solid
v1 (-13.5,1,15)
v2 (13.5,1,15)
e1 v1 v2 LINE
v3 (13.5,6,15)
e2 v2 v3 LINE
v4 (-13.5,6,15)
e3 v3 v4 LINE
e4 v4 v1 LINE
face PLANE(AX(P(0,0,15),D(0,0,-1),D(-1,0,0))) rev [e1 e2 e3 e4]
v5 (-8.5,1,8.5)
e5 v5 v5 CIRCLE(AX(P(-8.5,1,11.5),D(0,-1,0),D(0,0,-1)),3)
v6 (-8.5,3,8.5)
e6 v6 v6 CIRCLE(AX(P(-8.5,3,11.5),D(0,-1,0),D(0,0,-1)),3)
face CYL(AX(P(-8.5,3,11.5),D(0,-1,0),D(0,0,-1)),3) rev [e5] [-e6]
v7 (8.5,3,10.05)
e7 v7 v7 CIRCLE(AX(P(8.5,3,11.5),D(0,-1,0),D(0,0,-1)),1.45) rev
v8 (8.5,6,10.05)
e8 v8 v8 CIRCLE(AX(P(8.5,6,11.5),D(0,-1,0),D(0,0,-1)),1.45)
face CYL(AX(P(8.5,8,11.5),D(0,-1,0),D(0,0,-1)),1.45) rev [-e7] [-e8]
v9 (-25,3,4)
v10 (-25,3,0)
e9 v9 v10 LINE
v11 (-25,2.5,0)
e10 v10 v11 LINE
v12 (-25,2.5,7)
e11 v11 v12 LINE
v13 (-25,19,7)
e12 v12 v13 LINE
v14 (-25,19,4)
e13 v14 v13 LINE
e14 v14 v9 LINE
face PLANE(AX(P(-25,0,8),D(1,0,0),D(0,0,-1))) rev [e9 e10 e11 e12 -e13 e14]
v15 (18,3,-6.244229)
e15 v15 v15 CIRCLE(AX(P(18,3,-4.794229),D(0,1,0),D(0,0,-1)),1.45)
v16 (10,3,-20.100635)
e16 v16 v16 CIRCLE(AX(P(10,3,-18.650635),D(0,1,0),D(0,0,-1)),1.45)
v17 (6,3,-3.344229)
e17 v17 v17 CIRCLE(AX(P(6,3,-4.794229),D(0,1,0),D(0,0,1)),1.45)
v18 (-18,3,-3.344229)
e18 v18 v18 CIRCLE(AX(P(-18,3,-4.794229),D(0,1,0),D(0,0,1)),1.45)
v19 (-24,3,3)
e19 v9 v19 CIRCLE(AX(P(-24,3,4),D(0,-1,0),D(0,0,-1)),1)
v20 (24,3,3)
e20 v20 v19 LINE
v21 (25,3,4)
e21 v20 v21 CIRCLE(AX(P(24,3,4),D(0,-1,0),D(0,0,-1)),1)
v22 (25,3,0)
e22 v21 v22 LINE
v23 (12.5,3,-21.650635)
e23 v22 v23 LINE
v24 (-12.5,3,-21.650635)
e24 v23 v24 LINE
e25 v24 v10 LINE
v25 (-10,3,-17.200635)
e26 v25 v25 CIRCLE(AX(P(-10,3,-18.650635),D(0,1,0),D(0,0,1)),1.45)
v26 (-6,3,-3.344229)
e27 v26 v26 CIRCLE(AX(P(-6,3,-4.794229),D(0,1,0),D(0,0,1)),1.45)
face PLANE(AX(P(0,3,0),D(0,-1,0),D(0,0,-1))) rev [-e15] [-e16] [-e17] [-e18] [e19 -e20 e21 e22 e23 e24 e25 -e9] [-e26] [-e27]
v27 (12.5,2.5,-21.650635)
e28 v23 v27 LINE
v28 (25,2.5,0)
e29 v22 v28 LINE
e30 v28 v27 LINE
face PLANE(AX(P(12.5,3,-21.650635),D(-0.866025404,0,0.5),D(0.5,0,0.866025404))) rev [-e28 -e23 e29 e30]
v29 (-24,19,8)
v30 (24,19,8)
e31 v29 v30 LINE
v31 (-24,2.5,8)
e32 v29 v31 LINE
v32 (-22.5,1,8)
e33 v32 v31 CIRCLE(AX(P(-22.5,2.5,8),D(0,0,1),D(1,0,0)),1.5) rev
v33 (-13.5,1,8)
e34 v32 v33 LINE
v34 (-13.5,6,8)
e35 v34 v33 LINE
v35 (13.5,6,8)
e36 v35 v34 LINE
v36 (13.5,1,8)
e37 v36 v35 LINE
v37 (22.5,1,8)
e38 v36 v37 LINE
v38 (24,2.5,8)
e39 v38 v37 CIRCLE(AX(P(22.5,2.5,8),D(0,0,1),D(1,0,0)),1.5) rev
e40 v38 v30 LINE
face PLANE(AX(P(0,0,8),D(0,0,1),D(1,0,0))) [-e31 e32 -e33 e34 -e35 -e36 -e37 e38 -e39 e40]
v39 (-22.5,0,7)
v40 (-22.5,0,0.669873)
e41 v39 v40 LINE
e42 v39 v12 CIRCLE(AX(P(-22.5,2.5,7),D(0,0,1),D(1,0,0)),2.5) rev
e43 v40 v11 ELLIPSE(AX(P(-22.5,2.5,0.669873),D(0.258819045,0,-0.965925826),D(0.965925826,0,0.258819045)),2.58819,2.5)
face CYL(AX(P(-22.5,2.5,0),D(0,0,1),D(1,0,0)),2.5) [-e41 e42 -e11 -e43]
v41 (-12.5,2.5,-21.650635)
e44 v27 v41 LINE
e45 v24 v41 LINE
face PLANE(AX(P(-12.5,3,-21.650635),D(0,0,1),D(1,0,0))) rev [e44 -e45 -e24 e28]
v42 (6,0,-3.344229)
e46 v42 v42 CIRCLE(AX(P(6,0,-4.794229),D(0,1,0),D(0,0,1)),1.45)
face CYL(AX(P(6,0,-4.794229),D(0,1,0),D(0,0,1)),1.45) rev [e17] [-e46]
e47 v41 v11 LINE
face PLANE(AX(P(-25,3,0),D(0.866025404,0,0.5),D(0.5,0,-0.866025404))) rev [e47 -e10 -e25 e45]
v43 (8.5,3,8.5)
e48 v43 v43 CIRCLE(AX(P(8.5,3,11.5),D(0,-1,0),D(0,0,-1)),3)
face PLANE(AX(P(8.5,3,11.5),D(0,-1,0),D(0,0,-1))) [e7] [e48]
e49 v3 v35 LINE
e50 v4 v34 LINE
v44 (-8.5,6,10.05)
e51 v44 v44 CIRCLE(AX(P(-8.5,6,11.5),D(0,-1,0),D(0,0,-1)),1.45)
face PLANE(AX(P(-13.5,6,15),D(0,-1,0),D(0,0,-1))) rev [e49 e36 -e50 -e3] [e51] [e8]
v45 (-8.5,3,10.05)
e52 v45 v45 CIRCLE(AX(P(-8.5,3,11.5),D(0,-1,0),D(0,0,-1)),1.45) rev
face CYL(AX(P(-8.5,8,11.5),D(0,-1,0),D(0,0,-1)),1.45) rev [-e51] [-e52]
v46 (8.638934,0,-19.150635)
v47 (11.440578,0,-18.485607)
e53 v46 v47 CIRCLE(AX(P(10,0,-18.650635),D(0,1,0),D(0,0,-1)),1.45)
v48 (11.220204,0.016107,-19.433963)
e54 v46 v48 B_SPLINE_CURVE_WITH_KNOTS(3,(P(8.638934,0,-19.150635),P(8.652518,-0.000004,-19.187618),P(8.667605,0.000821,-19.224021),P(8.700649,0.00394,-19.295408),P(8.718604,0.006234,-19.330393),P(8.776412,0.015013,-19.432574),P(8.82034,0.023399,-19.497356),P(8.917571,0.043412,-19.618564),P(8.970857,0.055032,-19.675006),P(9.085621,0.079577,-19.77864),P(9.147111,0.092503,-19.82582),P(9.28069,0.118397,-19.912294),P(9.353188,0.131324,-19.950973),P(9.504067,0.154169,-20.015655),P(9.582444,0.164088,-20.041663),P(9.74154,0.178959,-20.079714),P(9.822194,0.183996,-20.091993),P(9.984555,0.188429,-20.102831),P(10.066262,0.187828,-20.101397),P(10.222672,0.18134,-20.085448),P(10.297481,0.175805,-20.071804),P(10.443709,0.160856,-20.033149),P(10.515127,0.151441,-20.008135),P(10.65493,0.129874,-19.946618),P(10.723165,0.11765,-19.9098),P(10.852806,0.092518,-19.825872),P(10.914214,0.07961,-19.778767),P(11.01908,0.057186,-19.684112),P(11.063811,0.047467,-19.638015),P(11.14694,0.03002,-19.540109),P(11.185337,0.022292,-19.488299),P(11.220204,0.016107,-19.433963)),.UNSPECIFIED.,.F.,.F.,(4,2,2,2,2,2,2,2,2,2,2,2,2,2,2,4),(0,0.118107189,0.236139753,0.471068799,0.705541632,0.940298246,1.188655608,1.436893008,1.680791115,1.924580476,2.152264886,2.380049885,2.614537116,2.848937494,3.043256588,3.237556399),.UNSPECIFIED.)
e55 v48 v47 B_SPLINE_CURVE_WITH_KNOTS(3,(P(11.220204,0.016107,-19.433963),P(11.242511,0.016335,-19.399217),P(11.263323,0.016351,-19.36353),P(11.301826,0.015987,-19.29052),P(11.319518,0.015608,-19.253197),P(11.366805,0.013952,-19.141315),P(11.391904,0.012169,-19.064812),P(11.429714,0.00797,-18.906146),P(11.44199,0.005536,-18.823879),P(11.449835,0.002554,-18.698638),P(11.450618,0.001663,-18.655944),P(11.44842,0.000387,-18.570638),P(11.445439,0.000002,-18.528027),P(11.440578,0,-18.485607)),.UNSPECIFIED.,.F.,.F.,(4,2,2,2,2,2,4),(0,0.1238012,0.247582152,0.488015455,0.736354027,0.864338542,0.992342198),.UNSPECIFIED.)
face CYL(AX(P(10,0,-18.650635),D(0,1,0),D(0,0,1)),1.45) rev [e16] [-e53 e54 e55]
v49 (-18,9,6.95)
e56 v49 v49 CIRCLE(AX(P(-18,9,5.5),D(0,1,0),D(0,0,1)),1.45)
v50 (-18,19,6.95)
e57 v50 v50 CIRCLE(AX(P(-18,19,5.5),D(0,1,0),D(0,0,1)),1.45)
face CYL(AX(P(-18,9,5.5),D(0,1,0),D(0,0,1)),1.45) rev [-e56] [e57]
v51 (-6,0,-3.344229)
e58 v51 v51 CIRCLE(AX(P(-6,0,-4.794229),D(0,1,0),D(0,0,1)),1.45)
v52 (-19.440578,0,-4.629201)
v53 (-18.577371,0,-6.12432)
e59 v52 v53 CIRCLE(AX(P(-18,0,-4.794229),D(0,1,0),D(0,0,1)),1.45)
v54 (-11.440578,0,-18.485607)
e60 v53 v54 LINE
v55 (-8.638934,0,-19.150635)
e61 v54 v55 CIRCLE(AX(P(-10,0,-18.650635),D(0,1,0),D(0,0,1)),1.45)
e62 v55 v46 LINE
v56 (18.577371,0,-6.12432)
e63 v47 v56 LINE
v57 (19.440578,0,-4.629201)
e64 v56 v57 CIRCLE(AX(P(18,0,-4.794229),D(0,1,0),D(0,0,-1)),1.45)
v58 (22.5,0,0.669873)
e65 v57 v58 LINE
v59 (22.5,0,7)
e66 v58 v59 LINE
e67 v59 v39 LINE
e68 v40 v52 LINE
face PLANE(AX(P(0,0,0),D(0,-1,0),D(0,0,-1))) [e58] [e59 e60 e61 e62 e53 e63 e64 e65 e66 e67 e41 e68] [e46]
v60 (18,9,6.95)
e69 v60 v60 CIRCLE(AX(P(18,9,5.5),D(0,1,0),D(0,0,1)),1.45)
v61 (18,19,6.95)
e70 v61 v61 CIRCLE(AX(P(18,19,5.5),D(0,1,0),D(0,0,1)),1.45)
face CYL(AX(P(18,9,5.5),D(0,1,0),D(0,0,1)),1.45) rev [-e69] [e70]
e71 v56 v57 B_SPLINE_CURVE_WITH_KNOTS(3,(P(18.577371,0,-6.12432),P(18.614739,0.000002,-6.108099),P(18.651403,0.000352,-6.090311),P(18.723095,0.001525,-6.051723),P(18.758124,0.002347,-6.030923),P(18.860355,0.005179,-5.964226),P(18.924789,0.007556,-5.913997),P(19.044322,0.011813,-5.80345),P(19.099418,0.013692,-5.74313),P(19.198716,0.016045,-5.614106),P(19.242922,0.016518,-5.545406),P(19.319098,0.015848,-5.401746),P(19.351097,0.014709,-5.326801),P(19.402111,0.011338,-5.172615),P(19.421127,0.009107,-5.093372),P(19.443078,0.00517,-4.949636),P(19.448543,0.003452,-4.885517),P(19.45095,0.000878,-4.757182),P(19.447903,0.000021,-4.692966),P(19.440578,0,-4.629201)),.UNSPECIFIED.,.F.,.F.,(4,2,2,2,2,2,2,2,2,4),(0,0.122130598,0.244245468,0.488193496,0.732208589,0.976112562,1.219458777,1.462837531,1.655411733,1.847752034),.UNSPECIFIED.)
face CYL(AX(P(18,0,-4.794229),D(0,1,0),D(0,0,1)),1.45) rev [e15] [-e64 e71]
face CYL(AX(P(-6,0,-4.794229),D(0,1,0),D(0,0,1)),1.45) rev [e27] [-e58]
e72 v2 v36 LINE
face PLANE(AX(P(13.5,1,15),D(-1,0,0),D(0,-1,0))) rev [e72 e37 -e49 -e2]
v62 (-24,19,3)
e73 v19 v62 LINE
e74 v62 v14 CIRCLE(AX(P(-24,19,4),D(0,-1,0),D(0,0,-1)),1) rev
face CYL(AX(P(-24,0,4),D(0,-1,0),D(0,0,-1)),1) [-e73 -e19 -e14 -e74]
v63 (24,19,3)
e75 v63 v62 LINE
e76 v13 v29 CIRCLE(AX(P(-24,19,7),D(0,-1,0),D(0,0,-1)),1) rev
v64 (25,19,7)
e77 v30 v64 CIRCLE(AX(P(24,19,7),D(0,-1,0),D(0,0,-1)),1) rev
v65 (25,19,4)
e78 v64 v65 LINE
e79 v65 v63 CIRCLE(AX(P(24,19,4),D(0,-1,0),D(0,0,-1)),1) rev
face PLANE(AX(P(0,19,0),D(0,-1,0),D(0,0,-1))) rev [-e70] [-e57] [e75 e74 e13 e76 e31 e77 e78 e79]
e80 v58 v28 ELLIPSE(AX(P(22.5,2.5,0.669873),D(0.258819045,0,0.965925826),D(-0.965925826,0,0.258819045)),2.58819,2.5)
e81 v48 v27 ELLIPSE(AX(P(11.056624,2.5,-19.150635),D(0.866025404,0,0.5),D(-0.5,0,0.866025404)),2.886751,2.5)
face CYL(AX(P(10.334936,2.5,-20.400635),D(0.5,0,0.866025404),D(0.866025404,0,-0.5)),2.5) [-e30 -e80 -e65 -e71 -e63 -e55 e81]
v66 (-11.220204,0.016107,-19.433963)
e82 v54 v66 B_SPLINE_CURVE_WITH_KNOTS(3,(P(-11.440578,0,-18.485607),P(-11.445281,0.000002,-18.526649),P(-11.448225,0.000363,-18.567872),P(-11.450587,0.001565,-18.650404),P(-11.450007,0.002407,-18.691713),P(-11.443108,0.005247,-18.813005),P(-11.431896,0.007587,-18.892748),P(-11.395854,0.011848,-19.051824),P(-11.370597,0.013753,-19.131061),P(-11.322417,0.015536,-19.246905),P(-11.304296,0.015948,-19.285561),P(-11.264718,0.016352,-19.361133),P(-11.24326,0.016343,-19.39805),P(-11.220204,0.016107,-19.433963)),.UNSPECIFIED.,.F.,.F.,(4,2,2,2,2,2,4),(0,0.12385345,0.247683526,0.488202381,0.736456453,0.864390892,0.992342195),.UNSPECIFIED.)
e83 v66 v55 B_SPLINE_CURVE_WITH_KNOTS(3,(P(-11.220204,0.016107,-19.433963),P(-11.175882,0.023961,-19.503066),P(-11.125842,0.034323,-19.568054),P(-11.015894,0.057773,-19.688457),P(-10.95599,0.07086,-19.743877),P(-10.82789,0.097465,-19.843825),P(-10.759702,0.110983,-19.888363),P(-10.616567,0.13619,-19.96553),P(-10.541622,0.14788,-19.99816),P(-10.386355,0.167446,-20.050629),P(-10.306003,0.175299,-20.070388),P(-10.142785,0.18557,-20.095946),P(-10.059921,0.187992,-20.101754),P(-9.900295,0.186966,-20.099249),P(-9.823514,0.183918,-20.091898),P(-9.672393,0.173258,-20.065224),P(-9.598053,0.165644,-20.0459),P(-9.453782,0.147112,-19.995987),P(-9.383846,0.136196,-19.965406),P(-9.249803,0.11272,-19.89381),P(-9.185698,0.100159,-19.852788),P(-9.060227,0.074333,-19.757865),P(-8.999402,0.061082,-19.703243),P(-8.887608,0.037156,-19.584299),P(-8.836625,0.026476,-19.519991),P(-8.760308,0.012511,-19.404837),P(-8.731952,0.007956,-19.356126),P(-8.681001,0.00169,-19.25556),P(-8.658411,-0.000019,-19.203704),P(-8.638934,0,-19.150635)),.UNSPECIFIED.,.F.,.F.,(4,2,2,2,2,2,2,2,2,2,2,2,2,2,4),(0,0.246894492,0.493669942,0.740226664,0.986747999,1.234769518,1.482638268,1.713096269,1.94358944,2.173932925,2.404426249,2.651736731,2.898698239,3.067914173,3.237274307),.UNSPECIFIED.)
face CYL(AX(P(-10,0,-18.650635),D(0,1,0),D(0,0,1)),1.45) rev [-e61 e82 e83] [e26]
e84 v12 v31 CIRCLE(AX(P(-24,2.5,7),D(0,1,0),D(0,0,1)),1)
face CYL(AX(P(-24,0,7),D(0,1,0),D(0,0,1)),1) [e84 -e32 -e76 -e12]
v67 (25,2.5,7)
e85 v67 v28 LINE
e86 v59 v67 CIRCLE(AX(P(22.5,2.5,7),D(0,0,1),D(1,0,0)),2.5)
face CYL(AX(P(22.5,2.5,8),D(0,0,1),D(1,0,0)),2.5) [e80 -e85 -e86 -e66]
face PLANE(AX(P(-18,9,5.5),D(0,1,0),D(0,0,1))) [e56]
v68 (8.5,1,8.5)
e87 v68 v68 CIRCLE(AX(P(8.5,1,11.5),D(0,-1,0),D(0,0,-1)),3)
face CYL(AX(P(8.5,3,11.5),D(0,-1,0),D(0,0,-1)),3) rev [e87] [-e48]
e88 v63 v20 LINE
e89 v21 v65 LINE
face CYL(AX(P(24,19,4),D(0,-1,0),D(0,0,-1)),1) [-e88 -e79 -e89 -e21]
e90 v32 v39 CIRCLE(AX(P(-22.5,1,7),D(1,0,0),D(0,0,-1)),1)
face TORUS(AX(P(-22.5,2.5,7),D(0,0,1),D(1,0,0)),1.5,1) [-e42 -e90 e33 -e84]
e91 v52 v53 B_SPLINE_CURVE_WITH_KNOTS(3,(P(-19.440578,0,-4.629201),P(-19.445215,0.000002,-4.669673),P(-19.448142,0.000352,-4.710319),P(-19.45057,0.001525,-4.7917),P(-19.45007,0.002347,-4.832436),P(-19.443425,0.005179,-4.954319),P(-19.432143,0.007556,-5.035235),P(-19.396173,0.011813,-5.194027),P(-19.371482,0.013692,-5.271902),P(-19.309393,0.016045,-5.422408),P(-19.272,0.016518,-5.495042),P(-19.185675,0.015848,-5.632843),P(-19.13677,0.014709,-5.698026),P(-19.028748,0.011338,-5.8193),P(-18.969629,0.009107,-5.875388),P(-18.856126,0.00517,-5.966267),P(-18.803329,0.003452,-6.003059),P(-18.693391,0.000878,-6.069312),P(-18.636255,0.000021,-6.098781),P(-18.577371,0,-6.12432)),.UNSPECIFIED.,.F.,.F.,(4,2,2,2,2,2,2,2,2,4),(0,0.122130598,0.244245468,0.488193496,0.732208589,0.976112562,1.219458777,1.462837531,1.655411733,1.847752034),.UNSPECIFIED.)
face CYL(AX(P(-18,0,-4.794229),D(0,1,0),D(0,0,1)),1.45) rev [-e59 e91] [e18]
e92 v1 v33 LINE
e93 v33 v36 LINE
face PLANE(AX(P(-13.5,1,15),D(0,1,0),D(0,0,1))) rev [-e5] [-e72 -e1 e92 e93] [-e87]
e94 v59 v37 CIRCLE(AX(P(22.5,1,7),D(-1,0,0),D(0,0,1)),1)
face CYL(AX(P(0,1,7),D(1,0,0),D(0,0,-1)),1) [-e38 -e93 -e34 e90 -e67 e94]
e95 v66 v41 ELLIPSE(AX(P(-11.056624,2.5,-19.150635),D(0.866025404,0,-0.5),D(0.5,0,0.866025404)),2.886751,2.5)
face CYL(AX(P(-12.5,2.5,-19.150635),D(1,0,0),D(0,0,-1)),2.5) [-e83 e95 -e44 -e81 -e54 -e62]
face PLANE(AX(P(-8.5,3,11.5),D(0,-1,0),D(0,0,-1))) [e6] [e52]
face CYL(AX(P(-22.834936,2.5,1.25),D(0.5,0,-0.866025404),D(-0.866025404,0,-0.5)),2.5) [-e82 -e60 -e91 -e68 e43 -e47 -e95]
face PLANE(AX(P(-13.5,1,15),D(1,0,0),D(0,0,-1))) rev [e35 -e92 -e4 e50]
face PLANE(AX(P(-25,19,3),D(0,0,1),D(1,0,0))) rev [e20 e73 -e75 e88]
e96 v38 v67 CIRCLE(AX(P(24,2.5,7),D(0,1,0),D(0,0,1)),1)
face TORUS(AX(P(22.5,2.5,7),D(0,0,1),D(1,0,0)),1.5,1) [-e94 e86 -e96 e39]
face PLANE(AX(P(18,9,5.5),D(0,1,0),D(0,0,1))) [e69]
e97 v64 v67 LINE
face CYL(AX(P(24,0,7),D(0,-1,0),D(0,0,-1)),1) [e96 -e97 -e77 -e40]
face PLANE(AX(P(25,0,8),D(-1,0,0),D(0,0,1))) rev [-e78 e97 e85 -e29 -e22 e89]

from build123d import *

# Parameters (mm, degrees)
EXTRUDE_1_DEPTH     = 3
SKETCH_2_R          = 1.45
CUT_EXTRUDE_1_DEPTH = 3
SKETCH_3_W          = 50
SKETCH_3_H          = 3
EXTRUDE_2_DEPTH     = 8
SKETCH_4_W          = 50
SKETCH_4_H          = 5
EXTRUDE_3_DEPTH     = 16
SKETCH_6_W          = 27
SKETCH_6_H          = 5
EXTRUDE_4_DEPTH     = 7
SKETCH_7_R          = 1.45
CUT_EXTRUDE_2_DEPTH = 7
SKETCH_8_R          = 3
CUT_EXTRUDE_3_DEPTH = 2
FILLET_1_R          = 1
FILLET_2_R          = 2.5
SKETCH_9_R          = 1.45
CUT_EXTRUDE_4_DEPTH = 10


# Some blends are built 0.0001 mm under size
with BuildPart() as part:
    # Эскиз1 → Бобышка-Вытянуть1 (new body)
    with BuildSketch(Plane(origin=(0, 0, 0), x_dir=(1, 0, 0), z_dir=(0, 1, 0))):
        Polygon((-25, 0), (-12.5, 21.650635095), (12.5, 21.650635095), (25, 0), align=None)
    extrude(amount=EXTRUDE_1_DEPTH)

    # Эскиз2 → Вырез-Вытянуть1 (cut)
    with BuildSketch(Plane(origin=(0, 3, 0), x_dir=(1, 0, 0), z_dir=(0, 1, 0))):
        with Locations(Location((-10, 18.650635095, 0), (0, 0, 270))):
            Circle(SKETCH_2_R)
        with Locations(Location((-18, 4.794228634, 0), (0, 0, 270))):
            Circle(SKETCH_2_R)
        with Locations(Location((18, 4.794228634, 0), (0, 0, 90))):
            Circle(SKETCH_2_R)
        with Locations(Location((10, 18.650635095, 0), (0, 0, 90))):
            Circle(SKETCH_2_R)
        with Locations(Location((-6, 4.794228634, 0), (0, 0, 270))):
            Circle(SKETCH_2_R)
        with Locations(Location((6, 4.794228634, 0), (0, 0, 270))):
            Circle(SKETCH_2_R)
    extrude(amount=-CUT_EXTRUDE_1_DEPTH, mode=Mode.SUBTRACT)

    # Эскиз3 → Бобышка-Вытянуть2 (add)
    with BuildSketch(Plane.XY):
        with Locations((0, 1.5)):
            Rectangle(SKETCH_3_W, SKETCH_3_H)
    extrude(amount=EXTRUDE_2_DEPTH)

    # Эскиз4 → Бобышка-Вытянуть3 (add)
    with BuildSketch(Plane(origin=(0, 3, 0), x_dir=(1, 0, 0), z_dir=(0, 1, 0))):
        with Locations((0, -5.5)):
            Rectangle(SKETCH_4_W, SKETCH_4_H)
    extrude(amount=EXTRUDE_3_DEPTH)

    # Эскиз6 → Бобышка-Вытянуть4 (add)
    with BuildSketch(Plane.XY.offset(8)):
        with Locations((0, 3.5)):
            Rectangle(SKETCH_6_W, SKETCH_6_H)
    extrude(amount=EXTRUDE_4_DEPTH)

    # Эскиз7 → Вырез-Вытянуть2 (cut)
    with BuildSketch(Plane.XZ.offset(-1)):
        with Locations(Location((-8.5, 11.5, 0), (0, 0, 270))):
            Circle(SKETCH_7_R)
        with Locations(Location((8.5, 11.5, 0), (0, 0, 270))):
            Circle(SKETCH_7_R)
    extrude(amount=-CUT_EXTRUDE_2_DEPTH, mode=Mode.SUBTRACT)

    # Эскиз8 → Вырез-Вытянуть3 (cut)
    with BuildSketch(Plane.XZ.offset(-1)):
        with Locations(Location((-8.5, 11.5, 0), (0, 0, 270))):
            Circle(SKETCH_8_R)
        with Locations(Location((8.5, 11.5, 0), (0, 0, 270))):
            Circle(SKETCH_8_R)
    extrude(amount=-CUT_EXTRUDE_3_DEPTH, mode=Mode.SUBTRACT)

    # Скругление1
    fillet_1_edges = [part.edges().sort_by_distance(p)[0] for p in [
        (25, 9.5, 8),
        (-25, 9.5, 8),
        (0, 0, 8),
        (-25, 11, 3),
        (25, 11, 3),
    ]]
    fillet(fillet_1_edges, radius=FILLET_1_R - 0.0001)  # a hair under: the kernel refuses the full size

    # Скругление2
    # the kernel refuses this fillet: 2.5 mm, written as the material it takes off along each edge
    with BuildSketch(Plane(origin=(22.5, 2.5, 8), x_dir=(0, -1, 0), z_dir=(-1, 0, 0))) as fillet_2_piece_1:
        with BuildLine():
            CenterArc((1.5001, -0.9999), 0.9999, 0, 90)
            Line((2.5, -0.9999), (2.5, 0))
            Line((2.5, 0), (1.5001, 0))
        make_face()
    revolve(axis=Axis((22.5, 2.5, 8), (0, 0, 1)), revolution_arc=90, mode=Mode.SUBTRACT)
    with BuildSketch(Plane(origin=(-22.5, 2.5, 8), x_dir=(-1, 0, 0), z_dir=(0, 1, 0))) as fillet_2_piece_2:
        with BuildLine():
            CenterArc((1.5001, -0.9999), 0.9999, 0, 90)
            Line((2.5, -0.9999), (2.5, 0))
            Line((2.5, 0), (1.5001, 0))
        make_face()
    revolve(axis=Axis((-22.5, 2.5, 8), (0, 0, 1)), revolution_arc=90, mode=Mode.SUBTRACT)
    with BuildSketch(Plane(origin=(25, 0, -6.25), x_dir=(0, 1, 0), z_dir=(0, 0, 1))) as fillet_2_piece_3:
        with BuildLine():
            CenterArc((FILLET_2_R, FILLET_2_R), FILLET_2_R, 180, 90)
            Line((0, FILLET_2_R), (0, 0))
            Line((0, 0), (FILLET_2_R, 0))
        make_face()
    extrude(amount=14.25, mode=Mode.SUBTRACT)
    with BuildSketch(Plane(origin=(-25, 0, -6.25), x_dir=(0, 1, 0), z_dir=(0, 0, 1))) as fillet_2_piece_4:
        with BuildLine():
            CenterArc((FILLET_2_R, -FILLET_2_R), FILLET_2_R, 90, 90)
            Line((0, -FILLET_2_R), (0, 0))
            Line((0, 0), (FILLET_2_R, 0))
        make_face()
    extrude(amount=14.25, mode=Mode.SUBTRACT)
    with BuildSketch(Plane(origin=(-28.125, 0, 5.412658774), x_dir=(0, 1, 0), z_dir=(0.5000000000000041, 0, -0.8660254037844364)), Plane(origin=(-18.75, 0, -21.650635095), x_dir=(0, 1, 0), z_dir=(1, 0, 0)), Plane(origin=(9.375, 0, -27.063293868), x_dir=(0, 1, 0), z_dir=(0.5000000000000041, 0, 0.8660254037844364))) as fillet_2_piece_5:
        with BuildLine():
            CenterArc((FILLET_2_R, FILLET_2_R), FILLET_2_R, 180, 90)
            Line((0, FILLET_2_R), (0, 0))
            Line((0, 0), (FILLET_2_R, 0))
        make_face()
    extrude(amount=37.5, mode=Mode.SUBTRACT)

    # Эскиз9 → Вырез-Вытянуть4 (cut)
    with BuildSketch(Plane(origin=(0, 19, 0), x_dir=(1, 0, 0), z_dir=(0, 1, 0))):
        with Locations(Location((-18, -5.5, 0), (0, 0, 270))):
            Circle(SKETCH_9_R)
        with Locations(Location((18, -5.5, 0), (0, 0, 270))):
            Circle(SKETCH_9_R)
    extrude(amount=-CUT_EXTRUDE_4_DEPTH, mode=Mode.SUBTRACT)


solid = part.part
